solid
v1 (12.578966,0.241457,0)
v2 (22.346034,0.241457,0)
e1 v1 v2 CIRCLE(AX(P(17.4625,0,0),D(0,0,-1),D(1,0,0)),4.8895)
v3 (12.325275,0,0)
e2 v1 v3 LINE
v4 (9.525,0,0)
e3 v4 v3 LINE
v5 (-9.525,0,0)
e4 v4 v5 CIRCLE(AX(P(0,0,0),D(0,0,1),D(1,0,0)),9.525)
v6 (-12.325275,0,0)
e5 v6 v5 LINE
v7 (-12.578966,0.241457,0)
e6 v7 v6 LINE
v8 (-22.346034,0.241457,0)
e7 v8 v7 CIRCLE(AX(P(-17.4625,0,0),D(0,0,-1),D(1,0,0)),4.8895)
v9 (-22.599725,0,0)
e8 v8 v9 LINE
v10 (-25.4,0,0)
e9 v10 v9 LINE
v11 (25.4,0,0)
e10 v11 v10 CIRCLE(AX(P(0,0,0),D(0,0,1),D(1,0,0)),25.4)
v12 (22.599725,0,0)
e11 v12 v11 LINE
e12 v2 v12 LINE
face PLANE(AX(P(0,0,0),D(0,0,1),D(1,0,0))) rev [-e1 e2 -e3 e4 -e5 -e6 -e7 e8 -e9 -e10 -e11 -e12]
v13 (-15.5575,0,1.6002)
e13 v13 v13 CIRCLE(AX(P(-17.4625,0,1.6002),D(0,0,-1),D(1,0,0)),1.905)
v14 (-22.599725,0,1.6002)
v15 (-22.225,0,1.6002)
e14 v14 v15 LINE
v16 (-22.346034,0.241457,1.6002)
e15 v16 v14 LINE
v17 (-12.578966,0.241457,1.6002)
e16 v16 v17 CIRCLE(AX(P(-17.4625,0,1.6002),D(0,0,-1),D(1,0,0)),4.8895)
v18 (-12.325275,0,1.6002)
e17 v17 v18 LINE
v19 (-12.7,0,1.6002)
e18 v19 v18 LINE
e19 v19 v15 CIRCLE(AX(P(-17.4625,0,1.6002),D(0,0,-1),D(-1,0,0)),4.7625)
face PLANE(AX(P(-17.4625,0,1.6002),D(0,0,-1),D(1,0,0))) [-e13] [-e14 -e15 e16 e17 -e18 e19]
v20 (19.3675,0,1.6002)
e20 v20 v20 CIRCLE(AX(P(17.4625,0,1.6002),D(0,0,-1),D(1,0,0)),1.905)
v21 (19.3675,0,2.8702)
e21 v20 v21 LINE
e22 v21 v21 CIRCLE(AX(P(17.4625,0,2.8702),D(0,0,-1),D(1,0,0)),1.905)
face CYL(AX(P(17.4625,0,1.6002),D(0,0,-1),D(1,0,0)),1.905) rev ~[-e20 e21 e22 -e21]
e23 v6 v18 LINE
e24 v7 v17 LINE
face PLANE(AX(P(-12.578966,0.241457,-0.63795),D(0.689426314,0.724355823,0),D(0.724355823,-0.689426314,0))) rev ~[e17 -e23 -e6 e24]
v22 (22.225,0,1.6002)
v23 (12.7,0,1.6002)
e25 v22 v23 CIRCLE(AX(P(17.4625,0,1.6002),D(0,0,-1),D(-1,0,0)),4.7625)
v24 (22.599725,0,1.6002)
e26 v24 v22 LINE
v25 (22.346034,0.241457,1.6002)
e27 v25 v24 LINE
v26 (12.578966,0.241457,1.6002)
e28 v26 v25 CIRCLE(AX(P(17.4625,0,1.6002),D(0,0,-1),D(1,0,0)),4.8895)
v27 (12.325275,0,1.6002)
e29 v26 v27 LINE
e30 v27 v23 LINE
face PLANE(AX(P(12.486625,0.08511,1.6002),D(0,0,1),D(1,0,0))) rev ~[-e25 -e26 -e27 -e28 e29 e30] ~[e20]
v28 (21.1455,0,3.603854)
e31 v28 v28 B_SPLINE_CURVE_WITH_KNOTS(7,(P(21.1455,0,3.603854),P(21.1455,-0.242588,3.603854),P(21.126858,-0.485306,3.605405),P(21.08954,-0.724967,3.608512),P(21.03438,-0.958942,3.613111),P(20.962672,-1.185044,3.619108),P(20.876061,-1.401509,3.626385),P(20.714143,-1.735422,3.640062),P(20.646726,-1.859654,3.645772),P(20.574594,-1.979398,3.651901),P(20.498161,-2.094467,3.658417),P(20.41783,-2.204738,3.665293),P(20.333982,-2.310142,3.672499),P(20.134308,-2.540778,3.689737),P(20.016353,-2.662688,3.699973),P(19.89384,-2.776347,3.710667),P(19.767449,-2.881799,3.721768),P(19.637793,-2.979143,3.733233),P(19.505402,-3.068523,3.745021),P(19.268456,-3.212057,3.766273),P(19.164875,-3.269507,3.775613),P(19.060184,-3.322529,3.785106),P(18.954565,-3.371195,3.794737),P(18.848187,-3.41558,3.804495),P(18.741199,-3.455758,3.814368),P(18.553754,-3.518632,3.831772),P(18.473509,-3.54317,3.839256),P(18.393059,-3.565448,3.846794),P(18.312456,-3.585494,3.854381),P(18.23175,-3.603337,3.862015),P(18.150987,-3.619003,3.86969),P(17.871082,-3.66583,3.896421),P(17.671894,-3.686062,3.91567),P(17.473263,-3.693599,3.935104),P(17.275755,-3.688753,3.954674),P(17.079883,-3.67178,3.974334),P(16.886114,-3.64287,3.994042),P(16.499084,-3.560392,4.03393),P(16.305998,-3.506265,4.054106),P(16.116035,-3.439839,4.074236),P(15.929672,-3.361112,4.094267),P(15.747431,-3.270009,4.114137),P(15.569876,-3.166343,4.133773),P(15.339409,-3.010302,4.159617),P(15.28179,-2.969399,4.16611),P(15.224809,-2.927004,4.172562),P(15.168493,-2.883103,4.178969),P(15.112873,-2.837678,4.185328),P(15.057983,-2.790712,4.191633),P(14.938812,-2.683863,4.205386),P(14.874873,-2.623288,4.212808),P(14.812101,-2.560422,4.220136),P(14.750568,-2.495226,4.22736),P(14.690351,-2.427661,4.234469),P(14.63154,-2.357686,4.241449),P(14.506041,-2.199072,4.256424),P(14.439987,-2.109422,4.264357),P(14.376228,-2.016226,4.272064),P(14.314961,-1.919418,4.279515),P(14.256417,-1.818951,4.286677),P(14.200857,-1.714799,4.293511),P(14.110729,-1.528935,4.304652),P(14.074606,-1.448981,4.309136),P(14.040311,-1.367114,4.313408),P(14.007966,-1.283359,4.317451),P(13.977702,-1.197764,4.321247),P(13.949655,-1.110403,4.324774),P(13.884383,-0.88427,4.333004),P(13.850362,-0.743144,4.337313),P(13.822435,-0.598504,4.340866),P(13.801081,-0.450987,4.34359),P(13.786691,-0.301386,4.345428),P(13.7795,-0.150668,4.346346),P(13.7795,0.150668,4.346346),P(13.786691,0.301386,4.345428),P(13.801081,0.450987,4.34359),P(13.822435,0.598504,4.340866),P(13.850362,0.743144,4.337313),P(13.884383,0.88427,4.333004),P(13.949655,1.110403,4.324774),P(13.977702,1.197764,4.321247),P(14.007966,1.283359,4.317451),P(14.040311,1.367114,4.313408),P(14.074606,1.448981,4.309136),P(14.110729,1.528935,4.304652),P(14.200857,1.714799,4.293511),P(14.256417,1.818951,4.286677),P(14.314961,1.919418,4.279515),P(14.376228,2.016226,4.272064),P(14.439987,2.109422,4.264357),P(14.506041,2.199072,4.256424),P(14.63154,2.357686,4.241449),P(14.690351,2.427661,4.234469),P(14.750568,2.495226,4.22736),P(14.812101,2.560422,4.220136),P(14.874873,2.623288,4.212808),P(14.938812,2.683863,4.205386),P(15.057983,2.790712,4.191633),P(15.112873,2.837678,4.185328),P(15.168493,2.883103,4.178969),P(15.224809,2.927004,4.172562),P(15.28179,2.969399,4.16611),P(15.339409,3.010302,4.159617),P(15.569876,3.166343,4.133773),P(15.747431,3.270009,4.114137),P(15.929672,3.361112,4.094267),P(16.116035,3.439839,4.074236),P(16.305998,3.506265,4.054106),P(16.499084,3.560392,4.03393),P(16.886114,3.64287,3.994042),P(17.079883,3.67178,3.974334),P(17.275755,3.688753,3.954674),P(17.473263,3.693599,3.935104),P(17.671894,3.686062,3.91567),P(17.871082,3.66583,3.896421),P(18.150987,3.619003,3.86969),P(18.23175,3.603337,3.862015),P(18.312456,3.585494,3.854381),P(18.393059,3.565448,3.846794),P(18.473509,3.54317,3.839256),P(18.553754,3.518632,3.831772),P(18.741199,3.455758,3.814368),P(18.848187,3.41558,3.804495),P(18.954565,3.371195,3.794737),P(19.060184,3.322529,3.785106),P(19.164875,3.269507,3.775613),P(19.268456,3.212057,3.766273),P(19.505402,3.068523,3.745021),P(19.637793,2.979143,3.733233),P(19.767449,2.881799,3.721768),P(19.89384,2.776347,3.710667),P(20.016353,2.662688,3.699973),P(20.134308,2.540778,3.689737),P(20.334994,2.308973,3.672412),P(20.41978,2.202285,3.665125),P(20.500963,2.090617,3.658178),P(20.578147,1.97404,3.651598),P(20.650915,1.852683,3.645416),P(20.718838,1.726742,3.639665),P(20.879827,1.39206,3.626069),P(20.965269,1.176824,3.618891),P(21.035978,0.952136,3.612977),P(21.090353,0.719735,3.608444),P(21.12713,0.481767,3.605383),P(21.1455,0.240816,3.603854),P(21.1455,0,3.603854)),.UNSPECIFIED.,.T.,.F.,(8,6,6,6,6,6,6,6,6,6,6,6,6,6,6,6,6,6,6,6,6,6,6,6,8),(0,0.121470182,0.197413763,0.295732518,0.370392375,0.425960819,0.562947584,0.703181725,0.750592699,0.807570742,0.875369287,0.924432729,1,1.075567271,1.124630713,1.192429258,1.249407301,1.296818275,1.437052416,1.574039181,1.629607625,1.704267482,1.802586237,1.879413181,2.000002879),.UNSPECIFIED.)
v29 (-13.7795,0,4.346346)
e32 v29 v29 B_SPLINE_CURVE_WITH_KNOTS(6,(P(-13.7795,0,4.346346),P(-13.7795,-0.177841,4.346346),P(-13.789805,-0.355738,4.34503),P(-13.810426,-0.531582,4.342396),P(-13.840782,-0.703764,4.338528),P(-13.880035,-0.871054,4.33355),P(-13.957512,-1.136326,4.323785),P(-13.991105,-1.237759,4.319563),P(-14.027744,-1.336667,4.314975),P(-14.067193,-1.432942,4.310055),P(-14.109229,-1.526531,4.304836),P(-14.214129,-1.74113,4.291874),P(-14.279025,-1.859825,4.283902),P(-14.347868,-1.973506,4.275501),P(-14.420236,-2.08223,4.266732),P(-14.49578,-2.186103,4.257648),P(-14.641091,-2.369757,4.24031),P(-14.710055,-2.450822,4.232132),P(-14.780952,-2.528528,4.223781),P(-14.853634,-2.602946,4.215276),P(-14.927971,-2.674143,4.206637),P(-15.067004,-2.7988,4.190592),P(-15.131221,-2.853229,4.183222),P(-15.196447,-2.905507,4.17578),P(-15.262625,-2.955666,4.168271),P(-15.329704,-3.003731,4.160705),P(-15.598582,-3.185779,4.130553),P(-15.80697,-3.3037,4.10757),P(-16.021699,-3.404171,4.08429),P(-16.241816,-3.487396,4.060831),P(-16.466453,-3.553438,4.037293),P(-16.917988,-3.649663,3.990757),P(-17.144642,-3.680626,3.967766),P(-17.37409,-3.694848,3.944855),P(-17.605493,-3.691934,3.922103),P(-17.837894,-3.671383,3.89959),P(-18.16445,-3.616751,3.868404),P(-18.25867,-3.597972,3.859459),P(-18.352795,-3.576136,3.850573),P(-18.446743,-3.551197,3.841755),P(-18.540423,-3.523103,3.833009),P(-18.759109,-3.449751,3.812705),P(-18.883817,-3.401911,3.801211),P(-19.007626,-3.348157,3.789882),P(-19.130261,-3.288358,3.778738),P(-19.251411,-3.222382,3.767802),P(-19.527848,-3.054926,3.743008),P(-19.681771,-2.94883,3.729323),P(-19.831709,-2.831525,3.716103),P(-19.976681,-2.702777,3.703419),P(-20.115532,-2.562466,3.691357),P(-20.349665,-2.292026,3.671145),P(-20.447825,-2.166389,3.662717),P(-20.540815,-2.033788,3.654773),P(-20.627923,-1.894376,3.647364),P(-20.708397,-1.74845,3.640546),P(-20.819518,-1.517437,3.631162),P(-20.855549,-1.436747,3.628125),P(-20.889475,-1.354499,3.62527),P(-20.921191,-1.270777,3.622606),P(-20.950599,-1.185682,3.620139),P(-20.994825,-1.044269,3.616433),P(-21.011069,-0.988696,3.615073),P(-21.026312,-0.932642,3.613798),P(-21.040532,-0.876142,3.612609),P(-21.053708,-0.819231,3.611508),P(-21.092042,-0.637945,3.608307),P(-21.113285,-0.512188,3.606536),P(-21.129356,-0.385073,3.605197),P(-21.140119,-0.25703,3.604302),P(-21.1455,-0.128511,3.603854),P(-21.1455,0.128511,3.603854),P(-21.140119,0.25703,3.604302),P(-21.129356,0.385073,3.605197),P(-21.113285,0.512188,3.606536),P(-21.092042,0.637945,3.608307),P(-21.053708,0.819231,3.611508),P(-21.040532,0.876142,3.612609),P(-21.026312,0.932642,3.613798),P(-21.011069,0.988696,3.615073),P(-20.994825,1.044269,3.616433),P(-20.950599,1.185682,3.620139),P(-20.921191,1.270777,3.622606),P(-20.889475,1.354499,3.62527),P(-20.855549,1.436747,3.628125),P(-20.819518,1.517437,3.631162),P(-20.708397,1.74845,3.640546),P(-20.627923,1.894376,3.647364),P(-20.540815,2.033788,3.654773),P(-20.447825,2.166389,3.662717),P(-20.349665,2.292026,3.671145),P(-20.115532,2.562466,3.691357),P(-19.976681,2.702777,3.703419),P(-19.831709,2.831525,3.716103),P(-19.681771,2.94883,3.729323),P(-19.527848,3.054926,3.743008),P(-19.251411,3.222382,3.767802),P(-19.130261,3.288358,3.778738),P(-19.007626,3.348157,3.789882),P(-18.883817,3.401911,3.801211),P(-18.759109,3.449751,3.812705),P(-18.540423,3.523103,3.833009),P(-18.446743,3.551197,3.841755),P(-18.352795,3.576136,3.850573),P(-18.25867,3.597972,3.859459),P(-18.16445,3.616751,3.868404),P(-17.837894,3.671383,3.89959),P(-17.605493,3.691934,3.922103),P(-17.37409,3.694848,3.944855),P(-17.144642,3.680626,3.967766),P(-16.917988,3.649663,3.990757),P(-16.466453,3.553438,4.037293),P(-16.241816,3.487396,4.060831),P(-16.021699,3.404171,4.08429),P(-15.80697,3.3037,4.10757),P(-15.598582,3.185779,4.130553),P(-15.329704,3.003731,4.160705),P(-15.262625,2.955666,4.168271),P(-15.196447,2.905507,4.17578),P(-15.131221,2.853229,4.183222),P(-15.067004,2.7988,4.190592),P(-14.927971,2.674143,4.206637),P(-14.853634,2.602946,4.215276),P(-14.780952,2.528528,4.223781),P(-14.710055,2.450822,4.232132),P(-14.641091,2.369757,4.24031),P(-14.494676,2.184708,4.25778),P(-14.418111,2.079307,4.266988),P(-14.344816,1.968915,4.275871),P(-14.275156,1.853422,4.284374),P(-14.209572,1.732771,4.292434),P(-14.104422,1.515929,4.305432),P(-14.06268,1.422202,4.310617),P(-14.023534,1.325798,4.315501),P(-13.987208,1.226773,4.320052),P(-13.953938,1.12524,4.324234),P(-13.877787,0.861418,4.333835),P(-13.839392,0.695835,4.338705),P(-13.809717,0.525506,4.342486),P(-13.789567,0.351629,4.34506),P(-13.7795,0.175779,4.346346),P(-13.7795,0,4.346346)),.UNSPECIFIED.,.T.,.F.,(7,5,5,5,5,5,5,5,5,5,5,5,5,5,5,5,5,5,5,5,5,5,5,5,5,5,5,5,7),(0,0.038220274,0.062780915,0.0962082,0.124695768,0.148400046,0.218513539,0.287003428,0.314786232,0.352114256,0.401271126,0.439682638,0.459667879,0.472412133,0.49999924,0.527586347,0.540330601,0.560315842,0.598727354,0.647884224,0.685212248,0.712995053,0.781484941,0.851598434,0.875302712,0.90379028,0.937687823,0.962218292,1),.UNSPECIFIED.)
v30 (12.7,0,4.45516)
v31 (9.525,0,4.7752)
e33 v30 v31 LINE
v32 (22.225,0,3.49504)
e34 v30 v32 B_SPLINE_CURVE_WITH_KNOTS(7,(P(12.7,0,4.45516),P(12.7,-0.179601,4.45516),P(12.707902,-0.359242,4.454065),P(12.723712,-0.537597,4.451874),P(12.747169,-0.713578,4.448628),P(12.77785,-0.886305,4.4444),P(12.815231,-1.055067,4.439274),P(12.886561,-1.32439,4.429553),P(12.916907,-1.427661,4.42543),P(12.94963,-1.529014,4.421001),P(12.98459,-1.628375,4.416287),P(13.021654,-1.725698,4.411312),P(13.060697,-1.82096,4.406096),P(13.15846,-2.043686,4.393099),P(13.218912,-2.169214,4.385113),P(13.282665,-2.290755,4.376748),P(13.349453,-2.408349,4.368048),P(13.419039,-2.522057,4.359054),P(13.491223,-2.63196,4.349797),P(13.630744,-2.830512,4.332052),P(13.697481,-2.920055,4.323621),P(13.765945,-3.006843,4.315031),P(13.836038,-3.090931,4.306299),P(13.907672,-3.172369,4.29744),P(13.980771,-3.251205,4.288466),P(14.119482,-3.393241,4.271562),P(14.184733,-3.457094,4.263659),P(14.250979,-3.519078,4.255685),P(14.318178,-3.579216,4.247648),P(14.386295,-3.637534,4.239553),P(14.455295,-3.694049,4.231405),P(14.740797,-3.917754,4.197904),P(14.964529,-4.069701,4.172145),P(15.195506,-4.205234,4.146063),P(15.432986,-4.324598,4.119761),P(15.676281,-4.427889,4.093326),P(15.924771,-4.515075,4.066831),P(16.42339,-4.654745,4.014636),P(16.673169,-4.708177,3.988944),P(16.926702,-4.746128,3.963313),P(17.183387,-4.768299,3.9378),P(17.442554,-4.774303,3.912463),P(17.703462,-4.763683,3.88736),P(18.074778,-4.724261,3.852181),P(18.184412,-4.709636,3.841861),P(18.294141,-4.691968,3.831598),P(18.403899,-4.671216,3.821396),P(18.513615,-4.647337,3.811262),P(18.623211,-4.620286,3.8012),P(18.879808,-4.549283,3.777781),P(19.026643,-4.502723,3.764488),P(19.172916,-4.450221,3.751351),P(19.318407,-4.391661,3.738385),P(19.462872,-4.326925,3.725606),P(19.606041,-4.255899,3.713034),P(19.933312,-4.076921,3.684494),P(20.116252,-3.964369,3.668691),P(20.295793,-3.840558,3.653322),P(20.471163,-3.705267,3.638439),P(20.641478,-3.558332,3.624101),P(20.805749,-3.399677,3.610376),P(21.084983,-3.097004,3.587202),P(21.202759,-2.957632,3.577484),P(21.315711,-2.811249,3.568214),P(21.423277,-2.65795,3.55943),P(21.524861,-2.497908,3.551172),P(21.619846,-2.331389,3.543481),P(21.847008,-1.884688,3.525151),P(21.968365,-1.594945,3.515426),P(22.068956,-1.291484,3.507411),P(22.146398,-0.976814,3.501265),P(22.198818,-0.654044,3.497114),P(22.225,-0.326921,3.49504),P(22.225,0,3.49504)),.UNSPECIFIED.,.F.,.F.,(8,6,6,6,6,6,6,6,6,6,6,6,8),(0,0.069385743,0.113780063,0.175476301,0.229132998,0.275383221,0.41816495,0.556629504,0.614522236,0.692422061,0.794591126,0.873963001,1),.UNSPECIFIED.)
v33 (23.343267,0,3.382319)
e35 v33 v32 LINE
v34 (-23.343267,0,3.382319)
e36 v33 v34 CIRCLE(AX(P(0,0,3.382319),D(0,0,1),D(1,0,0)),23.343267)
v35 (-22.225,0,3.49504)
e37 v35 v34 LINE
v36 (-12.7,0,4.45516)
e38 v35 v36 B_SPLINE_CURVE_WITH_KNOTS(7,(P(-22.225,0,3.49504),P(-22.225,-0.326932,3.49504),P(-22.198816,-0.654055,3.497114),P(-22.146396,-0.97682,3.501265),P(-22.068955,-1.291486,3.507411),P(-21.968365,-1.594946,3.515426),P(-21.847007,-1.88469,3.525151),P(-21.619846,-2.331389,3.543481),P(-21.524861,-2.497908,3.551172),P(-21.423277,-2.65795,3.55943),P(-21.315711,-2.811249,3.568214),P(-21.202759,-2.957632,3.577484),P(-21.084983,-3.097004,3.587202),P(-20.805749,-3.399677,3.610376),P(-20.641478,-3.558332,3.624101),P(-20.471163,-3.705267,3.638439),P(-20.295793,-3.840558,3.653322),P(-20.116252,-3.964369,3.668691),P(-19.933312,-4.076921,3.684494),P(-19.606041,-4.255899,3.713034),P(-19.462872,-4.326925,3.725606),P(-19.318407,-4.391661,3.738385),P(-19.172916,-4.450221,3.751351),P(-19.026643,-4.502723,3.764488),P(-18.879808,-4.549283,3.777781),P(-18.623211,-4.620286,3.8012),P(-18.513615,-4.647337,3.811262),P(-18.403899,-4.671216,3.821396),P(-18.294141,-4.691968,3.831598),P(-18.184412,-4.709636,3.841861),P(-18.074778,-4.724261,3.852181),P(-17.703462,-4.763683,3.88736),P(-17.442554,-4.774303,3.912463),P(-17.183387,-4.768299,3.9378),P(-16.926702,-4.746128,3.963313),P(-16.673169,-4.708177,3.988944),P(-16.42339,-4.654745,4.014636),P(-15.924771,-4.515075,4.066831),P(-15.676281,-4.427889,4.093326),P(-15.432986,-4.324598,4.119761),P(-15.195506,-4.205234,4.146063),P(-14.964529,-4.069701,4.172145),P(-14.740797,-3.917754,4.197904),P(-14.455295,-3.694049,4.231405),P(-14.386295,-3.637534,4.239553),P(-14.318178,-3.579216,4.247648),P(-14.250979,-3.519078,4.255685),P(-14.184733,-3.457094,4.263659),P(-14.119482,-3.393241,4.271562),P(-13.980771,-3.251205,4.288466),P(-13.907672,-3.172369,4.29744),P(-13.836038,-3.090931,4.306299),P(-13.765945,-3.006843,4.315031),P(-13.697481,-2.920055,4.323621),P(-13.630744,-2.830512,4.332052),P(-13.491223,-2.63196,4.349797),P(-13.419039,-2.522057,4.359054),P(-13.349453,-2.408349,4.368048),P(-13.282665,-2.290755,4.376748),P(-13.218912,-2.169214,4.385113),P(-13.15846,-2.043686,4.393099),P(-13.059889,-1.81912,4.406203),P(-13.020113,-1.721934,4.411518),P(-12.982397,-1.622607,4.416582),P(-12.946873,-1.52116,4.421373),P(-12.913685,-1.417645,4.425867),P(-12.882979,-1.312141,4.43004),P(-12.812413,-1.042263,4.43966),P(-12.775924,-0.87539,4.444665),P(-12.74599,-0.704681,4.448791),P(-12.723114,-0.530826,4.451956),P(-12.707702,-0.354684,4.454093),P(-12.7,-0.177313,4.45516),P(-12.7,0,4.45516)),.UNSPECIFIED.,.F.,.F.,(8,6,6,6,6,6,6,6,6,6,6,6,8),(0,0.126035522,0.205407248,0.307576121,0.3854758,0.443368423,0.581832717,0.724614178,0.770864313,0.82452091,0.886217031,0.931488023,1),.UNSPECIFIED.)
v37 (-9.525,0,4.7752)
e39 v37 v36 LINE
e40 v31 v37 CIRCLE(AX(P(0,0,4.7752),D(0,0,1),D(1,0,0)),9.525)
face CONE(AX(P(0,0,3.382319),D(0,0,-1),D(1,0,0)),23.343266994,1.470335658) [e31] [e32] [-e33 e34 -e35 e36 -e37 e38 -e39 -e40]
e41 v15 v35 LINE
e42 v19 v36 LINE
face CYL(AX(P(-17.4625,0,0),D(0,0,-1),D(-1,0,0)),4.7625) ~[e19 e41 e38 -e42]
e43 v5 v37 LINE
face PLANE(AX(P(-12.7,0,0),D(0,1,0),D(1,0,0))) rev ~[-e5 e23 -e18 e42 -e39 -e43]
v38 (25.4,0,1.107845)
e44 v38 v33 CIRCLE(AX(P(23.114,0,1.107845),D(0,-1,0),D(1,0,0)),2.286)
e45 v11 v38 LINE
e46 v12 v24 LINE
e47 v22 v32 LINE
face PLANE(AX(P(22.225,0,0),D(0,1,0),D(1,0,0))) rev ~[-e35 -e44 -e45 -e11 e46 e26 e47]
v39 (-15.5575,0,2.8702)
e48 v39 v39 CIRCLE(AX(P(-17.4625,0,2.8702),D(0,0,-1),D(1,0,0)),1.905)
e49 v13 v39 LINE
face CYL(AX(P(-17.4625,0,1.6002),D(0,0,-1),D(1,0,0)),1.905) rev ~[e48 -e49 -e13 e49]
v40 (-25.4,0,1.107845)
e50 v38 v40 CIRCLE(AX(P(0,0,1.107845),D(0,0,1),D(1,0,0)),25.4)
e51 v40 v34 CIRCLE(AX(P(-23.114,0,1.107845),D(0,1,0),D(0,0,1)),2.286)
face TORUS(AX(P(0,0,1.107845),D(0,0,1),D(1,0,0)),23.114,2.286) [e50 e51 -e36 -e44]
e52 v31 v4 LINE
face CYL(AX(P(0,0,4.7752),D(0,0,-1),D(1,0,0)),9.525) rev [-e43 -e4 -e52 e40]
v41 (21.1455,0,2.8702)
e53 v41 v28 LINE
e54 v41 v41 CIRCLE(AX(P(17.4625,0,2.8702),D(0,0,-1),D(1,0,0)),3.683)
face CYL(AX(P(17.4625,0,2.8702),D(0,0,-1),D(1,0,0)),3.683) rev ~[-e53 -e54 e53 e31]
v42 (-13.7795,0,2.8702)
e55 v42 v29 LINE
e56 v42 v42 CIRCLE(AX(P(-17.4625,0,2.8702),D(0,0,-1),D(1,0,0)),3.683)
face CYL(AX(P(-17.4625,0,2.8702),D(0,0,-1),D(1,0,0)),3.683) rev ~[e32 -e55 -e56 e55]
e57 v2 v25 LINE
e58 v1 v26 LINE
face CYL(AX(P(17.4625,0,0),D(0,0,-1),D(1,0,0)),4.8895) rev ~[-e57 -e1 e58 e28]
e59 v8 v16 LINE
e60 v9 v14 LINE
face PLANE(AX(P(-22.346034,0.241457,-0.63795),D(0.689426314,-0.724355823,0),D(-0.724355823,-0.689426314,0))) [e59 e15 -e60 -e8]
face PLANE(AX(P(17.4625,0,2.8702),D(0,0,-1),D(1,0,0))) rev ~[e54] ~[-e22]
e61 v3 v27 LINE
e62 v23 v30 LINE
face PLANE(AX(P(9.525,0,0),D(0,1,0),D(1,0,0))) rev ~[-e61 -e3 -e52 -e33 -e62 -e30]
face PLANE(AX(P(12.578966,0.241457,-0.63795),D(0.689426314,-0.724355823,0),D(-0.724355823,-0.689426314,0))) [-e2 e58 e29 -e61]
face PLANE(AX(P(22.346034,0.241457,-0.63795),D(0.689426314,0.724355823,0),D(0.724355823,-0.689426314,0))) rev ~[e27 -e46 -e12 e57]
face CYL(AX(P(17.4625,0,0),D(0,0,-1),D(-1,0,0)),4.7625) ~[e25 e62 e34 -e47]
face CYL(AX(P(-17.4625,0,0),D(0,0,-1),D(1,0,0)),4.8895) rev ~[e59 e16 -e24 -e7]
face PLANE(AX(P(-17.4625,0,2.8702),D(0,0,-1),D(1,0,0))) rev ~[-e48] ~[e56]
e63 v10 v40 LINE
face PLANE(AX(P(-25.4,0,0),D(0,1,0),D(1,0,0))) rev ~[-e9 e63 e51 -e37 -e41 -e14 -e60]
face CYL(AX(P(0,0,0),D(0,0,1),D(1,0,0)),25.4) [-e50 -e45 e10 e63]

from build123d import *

# Parameters (mm, degrees)
F3_DEPTH     = 4.7762
F4_R         = 4.8895
F5_DEPTH     = 1.6002
F6_R         = 1.905
F7_DEPTH     = 3.1760001
F9_R         = 3.683
F10_DEPTH    = 1.9060001
F11_T1_DEPTH = 2.2381504403


# Not quite as in the source:
# - a fillet or chamfer that OpenCascade refuses, or shapes differently, is made with other operations: its cross-section is extruded or revolved along the edge and cut away or added


with BuildPart() as f1:
    # F0 (on Front) → F1 (revolve)
    with BuildSketch(Plane.XZ):
        with BuildLine():
            Line((9.525, 4.7752), (9.525, 0))
            Line((9.525, 0), (25.4, 0))
            Line((25.4, 0), (25.4, 1.10784454))
            ThreePointArc((25.4, 1.10784454), (24.8095678029, 2.6410913648), (23.343266994, 3.382318687))
            Line((23.343266994, 3.382318687), (9.525, 4.7752))
        make_face()
    revolve(axis=Axis((0, 0, 2.1961550228), (0, 0, 1)))

    # F2 (on face) → F3 (cut, through all)
    with BuildSketch(Plane(origin=(0, 0, 0), x_dir=(1, 0, 0), z_dir=(0, 0, -1))):
        with BuildLine():
            Line((-25.4, 25.4), (-25.4, 0))
            Line((-25.4, 0), (-22.225, 0))
            ThreePointArc((-22.225, 0), (-17.4625, 4.7625), (-12.7, 0))
            Line((-12.7, 0), (-9.525, 0))
            ThreePointArc((-9.525, 0), (0, 9.525), (9.525, 0))
            Line((9.525, 0), (12.7, 0))
            ThreePointArc((12.7, 0), (17.4625, 4.7625), (22.225, 0))
            Line((22.225, 0), (25.4, 0))
            Line((25.4, 0), (25.4, 25.4))
            Line((25.4, 25.4), (-25.4, 25.4))
        make_face()
        with BuildLine():
            ThreePointArc((9.525, 0), (0, 9.525), (-9.525, 0))
            ThreePointArc((-9.525, 0), (0, -9.525), (9.525, 0))
        make_face()
    extrude(amount=-F3_DEPTH, mode=Mode.SUBTRACT)

    # F4 (on face) → F5 (cut)
    with BuildSketch(Plane(origin=(0, 0, 0), x_dir=(1, 0, 0), z_dir=(0, 0, -1))):
        with Locations((-17.4625, 0)):
            Circle(F4_R)
        with Locations((17.4625, 0)):
            Circle(F4_R)
    extrude(amount=-F5_DEPTH, mode=Mode.SUBTRACT)

    # F6 (on face) → F7 (cut, through all)
    with BuildSketch(Plane(origin=(0, 0, 1.6002), x_dir=(1, 0, 0), z_dir=(0, 0, -1))):
        with Locations((-17.4625, 0)):
            Circle(F6_R)
        with Locations((17.4625, 0)):
            Circle(F6_R)
    extrude(amount=-F7_DEPTH, mode=Mode.SUBTRACT)

    # F9 (on offset) → F10 (cut, through all)
    with BuildSketch(Plane(origin=(0, 0, 2.8702), x_dir=(1, 0, 0), z_dir=(0, 0, -1))):
        with Locations((17.4625, 0)):
            Circle(F9_R)
        with Locations((-17.4625, 0)):
            Circle(F9_R)
    extrude(amount=-F10_DEPTH, mode=Mode.SUBTRACT)

    # F11: chamfer of 0.254 on 4 edges, made by hand

    # F11_s2 → F11_t1 (cut)
    with BuildSketch(Plane.XY.offset(-0.6379504403)):
        with BuildLine():
            Line((-22.3460344648, 0.2414567901), (-22.5997245668, 0))
            Line((-22.5997245668, 0), (-22.352, 0))
            ThreePointArc((-22.352, 0), (-22.3504182536, 0.1243599467), (-22.3460344648, 0.2414567901))
        make_face()
        with BuildLine():
            Line((-12.5789655352, 0.2414567901), (-12.3252754332, 0))
            Line((-12.3252754332, 0), (-12.573, 0))
            ThreePointArc((-12.573, 0), (-12.5745817464, 0.1243599467), (-12.5789655352, 0.2414567901))
        make_face()
        with BuildLine():
            Line((12.5789655352, 0.2414567901), (12.3252754332, 0))
            Line((12.3252754332, 0), (12.573, 0))
            ThreePointArc((12.573, 0), (12.5745817464, 0.1243599467), (12.5789655352, 0.2414567901))
        make_face()
        with BuildLine():
            Line((22.3460344648, 0.2414567901), (22.5997245668, 0))
            Line((22.5997245668, 0), (22.352, 0))
            ThreePointArc((22.352, 0), (22.3504182536, 0.1243599467), (22.3460344648, 0.2414567901))
        make_face()
    extrude(amount=F11_T1_DEPTH, mode=Mode.SUBTRACT)


solid = f1.part
